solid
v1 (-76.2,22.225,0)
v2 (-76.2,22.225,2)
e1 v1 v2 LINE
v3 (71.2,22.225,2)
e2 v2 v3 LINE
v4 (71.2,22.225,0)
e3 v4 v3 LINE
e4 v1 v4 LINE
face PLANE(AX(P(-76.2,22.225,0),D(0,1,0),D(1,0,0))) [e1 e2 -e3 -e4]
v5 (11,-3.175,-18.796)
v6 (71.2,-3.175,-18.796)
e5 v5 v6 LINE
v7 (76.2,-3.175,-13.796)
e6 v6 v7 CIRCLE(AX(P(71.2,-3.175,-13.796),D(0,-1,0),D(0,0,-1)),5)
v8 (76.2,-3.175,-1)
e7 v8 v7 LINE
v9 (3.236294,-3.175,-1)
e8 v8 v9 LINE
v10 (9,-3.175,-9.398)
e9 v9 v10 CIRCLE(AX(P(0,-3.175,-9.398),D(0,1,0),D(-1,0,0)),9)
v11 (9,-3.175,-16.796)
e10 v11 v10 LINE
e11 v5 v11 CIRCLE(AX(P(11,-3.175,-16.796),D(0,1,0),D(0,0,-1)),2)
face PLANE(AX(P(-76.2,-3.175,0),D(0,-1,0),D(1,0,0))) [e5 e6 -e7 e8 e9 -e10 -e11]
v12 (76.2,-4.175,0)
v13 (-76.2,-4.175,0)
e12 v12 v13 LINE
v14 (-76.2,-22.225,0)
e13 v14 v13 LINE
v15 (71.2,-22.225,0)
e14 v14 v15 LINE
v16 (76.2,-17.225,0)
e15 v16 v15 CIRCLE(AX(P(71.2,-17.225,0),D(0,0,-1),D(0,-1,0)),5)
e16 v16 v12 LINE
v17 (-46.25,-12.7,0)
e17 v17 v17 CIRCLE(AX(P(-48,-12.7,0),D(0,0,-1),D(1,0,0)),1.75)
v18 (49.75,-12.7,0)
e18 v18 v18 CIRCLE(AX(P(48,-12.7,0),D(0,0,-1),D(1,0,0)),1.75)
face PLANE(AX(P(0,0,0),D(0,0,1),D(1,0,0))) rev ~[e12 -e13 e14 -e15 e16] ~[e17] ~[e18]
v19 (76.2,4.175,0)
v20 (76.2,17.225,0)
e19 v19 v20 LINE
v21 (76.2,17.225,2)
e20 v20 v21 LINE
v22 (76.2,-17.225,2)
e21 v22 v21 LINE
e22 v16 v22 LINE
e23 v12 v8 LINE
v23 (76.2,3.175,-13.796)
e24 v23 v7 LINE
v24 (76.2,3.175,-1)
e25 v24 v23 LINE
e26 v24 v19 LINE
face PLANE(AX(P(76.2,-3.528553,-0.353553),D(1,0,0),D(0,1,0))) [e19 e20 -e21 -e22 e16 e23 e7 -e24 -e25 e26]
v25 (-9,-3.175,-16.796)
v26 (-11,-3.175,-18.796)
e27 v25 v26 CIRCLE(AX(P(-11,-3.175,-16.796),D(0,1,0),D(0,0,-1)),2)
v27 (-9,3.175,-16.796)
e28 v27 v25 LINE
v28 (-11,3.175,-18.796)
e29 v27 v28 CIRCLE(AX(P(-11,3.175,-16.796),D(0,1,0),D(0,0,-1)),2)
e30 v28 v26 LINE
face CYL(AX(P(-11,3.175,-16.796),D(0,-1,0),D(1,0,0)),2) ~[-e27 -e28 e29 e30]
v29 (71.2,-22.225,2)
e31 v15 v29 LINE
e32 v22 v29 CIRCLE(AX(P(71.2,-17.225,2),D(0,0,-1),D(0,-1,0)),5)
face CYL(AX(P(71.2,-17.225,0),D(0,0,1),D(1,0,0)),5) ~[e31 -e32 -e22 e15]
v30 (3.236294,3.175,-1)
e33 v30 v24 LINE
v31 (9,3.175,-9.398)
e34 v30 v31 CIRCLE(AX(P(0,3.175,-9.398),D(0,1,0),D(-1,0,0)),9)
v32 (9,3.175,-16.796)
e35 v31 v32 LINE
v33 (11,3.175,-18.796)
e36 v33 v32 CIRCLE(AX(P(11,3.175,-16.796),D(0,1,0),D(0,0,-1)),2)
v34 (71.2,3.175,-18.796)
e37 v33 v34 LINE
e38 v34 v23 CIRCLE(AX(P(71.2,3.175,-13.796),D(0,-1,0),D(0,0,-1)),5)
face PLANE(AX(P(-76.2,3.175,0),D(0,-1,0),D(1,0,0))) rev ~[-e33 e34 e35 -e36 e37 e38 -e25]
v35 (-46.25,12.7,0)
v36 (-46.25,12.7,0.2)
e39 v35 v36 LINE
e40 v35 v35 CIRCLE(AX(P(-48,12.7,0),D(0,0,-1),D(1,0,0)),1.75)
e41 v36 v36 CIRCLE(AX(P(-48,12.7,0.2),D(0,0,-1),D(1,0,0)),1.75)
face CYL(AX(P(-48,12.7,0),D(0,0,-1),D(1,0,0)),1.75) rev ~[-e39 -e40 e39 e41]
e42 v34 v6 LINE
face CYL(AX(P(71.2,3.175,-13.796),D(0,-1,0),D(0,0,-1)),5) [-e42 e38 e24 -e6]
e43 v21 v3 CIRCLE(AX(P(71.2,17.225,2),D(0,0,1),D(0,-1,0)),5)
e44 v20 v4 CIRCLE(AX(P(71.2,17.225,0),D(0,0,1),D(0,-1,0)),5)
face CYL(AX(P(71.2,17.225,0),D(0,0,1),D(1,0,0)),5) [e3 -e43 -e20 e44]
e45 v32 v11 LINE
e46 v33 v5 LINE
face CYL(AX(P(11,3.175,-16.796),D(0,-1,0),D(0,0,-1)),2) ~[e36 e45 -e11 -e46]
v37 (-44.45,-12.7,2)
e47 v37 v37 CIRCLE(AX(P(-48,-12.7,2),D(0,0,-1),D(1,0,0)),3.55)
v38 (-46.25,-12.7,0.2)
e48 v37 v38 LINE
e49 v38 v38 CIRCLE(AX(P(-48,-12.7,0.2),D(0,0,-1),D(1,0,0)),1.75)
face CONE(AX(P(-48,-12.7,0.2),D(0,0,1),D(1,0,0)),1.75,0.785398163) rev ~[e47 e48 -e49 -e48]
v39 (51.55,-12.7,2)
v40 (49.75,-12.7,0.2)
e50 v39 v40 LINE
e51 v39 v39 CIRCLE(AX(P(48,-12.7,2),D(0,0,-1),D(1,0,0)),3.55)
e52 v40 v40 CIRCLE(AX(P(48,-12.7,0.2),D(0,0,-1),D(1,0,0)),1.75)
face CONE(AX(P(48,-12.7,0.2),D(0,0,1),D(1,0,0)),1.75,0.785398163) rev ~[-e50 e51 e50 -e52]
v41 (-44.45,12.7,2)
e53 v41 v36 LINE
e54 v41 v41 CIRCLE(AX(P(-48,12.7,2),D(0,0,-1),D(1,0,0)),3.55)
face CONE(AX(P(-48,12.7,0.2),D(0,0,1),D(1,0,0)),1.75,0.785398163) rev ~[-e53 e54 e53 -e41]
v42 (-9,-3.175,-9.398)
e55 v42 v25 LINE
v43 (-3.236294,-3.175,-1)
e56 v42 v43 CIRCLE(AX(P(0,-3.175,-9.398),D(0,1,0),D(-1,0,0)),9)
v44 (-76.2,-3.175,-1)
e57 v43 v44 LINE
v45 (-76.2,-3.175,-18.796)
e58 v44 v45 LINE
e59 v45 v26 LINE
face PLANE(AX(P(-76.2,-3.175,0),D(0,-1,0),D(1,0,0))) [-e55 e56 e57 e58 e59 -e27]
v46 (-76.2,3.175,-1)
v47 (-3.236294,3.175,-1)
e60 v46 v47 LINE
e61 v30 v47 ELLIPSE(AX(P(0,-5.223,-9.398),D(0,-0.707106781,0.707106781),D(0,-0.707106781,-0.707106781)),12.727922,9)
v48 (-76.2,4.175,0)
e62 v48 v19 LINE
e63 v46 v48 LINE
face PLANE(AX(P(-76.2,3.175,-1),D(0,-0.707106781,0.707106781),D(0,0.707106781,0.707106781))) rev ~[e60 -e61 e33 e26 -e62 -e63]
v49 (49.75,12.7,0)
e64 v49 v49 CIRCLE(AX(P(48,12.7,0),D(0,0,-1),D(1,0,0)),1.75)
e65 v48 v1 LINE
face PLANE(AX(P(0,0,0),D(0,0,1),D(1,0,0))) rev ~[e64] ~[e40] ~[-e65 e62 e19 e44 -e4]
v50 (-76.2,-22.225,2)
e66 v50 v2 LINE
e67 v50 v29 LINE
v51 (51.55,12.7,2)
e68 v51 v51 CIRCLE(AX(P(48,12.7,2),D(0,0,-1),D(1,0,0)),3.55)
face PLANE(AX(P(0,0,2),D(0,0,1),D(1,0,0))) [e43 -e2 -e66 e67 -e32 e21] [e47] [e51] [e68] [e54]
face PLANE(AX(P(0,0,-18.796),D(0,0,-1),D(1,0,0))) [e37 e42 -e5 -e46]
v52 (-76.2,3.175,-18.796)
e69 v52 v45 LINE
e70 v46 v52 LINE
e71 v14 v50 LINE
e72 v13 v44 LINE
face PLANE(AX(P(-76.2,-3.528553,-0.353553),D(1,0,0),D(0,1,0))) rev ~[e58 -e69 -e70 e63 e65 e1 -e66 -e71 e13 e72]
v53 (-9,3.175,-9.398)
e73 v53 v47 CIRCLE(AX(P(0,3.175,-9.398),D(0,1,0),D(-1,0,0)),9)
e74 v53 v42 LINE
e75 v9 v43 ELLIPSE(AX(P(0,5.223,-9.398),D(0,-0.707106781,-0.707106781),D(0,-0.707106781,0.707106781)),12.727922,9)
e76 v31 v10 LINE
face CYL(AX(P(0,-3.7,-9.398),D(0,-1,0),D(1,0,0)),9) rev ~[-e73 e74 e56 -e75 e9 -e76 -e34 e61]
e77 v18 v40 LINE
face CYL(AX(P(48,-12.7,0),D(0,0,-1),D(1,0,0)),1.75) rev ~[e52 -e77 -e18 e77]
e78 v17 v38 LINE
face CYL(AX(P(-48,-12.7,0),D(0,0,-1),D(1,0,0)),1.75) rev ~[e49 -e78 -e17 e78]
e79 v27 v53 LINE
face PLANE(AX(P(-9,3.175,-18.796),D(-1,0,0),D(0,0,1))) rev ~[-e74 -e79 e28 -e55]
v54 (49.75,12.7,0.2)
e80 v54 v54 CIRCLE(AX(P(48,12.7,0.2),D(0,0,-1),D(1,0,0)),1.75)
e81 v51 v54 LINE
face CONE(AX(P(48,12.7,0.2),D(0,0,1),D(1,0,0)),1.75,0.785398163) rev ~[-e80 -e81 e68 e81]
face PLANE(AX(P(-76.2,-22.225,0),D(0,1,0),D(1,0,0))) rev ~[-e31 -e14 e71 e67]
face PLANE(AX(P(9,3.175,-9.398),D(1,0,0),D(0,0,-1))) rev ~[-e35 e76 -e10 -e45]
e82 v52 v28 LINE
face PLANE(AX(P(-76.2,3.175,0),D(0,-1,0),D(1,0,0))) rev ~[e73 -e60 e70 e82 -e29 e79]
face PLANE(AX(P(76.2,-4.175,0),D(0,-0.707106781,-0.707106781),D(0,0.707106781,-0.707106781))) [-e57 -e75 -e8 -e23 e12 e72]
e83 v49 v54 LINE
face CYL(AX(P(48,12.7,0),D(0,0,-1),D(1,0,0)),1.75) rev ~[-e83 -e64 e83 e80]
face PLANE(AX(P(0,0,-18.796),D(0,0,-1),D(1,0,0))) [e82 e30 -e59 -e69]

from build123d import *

# Parameters (mm, degrees)
F0_W         = 152.4
F0_H         = 44.45
F1_DEPTH     = 2
F2_W         = 152.4
F2_H         = 6.35
F3_DEPTH     = 18.796
F4_R         = 1.75
F5_DEPTH     = 25
F7_DEPTH     = 25.401
F8_SIZE      = 1.8
F9_T4_DEPTH  = 152.4
F9_S5_R      = 9
F9_T6_DEPTH  = 78
F9_T10_DEPTH = 152.4
F9_S11_R     = 9
F9_T12_DEPTH = 78
F10_R        = 2
F11_R        = 5


# Not quite as in the source:
# - a fillet or chamfer that OpenCascade refuses, or shapes differently, is made with other operations: its cross-section is extruded or revolved along the edge and cut away or added
# - a feature names something its author has since deleted; it is built from what else it names


with BuildPart() as f1:
    # F0 (on Top) → F1 (new body)
    with BuildSketch(Plane.XY):
        Rectangle(F0_W, F0_H)
    extrude(amount=F1_DEPTH)

    # F2 (on face) → F3 (join)
    with BuildSketch(Plane(origin=(0, 0, 0), x_dir=(1, 0, 0), z_dir=(0, 0, -1))):
        Rectangle(F2_W, F2_H)
    extrude(amount=F3_DEPTH)

    # F4 (on face) → F5 (cut)
    with BuildSketch(Plane(origin=(0, 0, 0), x_dir=(1, 0, 0), z_dir=(0, 0, -1))):
        with Locations((48, -12.7)):
            Circle(F4_R)
        with Locations((-48, -12.7)):
            Circle(F4_R)
        with Locations((-48, 12.7)):
            Circle(F4_R)
        with Locations((48, 12.7)):
            Circle(F4_R)
    extrude(amount=-F5_DEPTH, mode=Mode.SUBTRACT)

    # F6 (on face) → F7 (cut, through all)
    with BuildSketch(Plane(origin=(0, 3.175, 0), x_dir=(-1, 0, 0), z_dir=(0, 1, 0))):
        with BuildLine():
            ThreePointArc((-9, -9.398), (0, -18.398), (9, -9.398))
            ThreePointArc((9, -9.398), (0, -0.398), (-9, -9.398))
        make_face()
        with BuildLine():
            Line((9, -18.796), (9, -9.398))
            ThreePointArc((9, -9.398), (0, -18.398), (-9, -9.398))
            Line((-9, -9.398), (-9, -18.796))
            Line((-9, -18.796), (9, -18.796))
        make_face()
    extrude(amount=-F7_DEPTH, mode=Mode.SUBTRACT)

    # F8
    f8_edges = [f1.edges().sort_by_distance(p)[0] for p in [
        (46.25, -12.7, 2),
        (-49.75, -12.7, 2),
        (-49.75, 12.7, 2),
        (46.25, 12.7, 2),
    ]]
    chamfer(f8_edges, length=F8_SIZE)

    # F9: chamfer of 1 on 2 edges, made by hand


with BuildPart() as f9_tool2:
    # F9_s3 → F9_t4 (new body)
    with BuildSketch(Plane.YZ.offset(-76.2)):
        Polygon((3.175, -1), (4.175, 0), (3.175, 0), align=None)
    extrude(amount=F9_T4_DEPTH)

    # F9_s5 → F9_t6 (cut, symmetric)
    with BuildSketch(Plane.XZ.offset(-3.7)):
        with Locations((0, -9.398)):
            Circle(F9_S5_R)
    extrude(amount=F9_T6_DEPTH, both=True, mode=Mode.SUBTRACT)


with BuildPart() as f1_1:
    add(f1.part)

    # F9_t1: union F9_tool2
    add(f9_tool2.part)


with BuildPart() as f9_tool8:
    # F9_s9 → F9_t10 (new body)
    with BuildSketch(Plane.YZ.offset(76.2)):
        Polygon((-4.175, 0), (-3.175, -1), (-3.175, 0), align=None)
    extrude(amount=-F9_T10_DEPTH)

    # F9_s11 → F9_t12 (cut, symmetric)
    with BuildSketch(Plane.XZ.offset(3.7)):
        with Locations((0, -9.398)):
            Circle(F9_S11_R)
    extrude(amount=F9_T12_DEPTH, both=True, mode=Mode.SUBTRACT)


with BuildPart() as f1_2:
    add(f1_1.part)

    # F9_t7: union F9_tool8
    add(f9_tool8.part)

    # F10
    f10_edges = [f1_2.edges().sort_by_distance(p)[0] for p in [
        (9, 0, -18.796),
        (-9, 0, -18.796),
    ]]
    fillet(f10_edges, radius=F10_R)

    # F11
    f11_edges = [f1_2.edges().sort_by_distance(p)[0] for p in [
        (76.2, 0, -18.796),
        (76.2, -22.225, 1),
        (76.2, 22.225, 1),
    ]]
    fillet(f11_edges, radius=F11_R)


solid = f1_2.part
